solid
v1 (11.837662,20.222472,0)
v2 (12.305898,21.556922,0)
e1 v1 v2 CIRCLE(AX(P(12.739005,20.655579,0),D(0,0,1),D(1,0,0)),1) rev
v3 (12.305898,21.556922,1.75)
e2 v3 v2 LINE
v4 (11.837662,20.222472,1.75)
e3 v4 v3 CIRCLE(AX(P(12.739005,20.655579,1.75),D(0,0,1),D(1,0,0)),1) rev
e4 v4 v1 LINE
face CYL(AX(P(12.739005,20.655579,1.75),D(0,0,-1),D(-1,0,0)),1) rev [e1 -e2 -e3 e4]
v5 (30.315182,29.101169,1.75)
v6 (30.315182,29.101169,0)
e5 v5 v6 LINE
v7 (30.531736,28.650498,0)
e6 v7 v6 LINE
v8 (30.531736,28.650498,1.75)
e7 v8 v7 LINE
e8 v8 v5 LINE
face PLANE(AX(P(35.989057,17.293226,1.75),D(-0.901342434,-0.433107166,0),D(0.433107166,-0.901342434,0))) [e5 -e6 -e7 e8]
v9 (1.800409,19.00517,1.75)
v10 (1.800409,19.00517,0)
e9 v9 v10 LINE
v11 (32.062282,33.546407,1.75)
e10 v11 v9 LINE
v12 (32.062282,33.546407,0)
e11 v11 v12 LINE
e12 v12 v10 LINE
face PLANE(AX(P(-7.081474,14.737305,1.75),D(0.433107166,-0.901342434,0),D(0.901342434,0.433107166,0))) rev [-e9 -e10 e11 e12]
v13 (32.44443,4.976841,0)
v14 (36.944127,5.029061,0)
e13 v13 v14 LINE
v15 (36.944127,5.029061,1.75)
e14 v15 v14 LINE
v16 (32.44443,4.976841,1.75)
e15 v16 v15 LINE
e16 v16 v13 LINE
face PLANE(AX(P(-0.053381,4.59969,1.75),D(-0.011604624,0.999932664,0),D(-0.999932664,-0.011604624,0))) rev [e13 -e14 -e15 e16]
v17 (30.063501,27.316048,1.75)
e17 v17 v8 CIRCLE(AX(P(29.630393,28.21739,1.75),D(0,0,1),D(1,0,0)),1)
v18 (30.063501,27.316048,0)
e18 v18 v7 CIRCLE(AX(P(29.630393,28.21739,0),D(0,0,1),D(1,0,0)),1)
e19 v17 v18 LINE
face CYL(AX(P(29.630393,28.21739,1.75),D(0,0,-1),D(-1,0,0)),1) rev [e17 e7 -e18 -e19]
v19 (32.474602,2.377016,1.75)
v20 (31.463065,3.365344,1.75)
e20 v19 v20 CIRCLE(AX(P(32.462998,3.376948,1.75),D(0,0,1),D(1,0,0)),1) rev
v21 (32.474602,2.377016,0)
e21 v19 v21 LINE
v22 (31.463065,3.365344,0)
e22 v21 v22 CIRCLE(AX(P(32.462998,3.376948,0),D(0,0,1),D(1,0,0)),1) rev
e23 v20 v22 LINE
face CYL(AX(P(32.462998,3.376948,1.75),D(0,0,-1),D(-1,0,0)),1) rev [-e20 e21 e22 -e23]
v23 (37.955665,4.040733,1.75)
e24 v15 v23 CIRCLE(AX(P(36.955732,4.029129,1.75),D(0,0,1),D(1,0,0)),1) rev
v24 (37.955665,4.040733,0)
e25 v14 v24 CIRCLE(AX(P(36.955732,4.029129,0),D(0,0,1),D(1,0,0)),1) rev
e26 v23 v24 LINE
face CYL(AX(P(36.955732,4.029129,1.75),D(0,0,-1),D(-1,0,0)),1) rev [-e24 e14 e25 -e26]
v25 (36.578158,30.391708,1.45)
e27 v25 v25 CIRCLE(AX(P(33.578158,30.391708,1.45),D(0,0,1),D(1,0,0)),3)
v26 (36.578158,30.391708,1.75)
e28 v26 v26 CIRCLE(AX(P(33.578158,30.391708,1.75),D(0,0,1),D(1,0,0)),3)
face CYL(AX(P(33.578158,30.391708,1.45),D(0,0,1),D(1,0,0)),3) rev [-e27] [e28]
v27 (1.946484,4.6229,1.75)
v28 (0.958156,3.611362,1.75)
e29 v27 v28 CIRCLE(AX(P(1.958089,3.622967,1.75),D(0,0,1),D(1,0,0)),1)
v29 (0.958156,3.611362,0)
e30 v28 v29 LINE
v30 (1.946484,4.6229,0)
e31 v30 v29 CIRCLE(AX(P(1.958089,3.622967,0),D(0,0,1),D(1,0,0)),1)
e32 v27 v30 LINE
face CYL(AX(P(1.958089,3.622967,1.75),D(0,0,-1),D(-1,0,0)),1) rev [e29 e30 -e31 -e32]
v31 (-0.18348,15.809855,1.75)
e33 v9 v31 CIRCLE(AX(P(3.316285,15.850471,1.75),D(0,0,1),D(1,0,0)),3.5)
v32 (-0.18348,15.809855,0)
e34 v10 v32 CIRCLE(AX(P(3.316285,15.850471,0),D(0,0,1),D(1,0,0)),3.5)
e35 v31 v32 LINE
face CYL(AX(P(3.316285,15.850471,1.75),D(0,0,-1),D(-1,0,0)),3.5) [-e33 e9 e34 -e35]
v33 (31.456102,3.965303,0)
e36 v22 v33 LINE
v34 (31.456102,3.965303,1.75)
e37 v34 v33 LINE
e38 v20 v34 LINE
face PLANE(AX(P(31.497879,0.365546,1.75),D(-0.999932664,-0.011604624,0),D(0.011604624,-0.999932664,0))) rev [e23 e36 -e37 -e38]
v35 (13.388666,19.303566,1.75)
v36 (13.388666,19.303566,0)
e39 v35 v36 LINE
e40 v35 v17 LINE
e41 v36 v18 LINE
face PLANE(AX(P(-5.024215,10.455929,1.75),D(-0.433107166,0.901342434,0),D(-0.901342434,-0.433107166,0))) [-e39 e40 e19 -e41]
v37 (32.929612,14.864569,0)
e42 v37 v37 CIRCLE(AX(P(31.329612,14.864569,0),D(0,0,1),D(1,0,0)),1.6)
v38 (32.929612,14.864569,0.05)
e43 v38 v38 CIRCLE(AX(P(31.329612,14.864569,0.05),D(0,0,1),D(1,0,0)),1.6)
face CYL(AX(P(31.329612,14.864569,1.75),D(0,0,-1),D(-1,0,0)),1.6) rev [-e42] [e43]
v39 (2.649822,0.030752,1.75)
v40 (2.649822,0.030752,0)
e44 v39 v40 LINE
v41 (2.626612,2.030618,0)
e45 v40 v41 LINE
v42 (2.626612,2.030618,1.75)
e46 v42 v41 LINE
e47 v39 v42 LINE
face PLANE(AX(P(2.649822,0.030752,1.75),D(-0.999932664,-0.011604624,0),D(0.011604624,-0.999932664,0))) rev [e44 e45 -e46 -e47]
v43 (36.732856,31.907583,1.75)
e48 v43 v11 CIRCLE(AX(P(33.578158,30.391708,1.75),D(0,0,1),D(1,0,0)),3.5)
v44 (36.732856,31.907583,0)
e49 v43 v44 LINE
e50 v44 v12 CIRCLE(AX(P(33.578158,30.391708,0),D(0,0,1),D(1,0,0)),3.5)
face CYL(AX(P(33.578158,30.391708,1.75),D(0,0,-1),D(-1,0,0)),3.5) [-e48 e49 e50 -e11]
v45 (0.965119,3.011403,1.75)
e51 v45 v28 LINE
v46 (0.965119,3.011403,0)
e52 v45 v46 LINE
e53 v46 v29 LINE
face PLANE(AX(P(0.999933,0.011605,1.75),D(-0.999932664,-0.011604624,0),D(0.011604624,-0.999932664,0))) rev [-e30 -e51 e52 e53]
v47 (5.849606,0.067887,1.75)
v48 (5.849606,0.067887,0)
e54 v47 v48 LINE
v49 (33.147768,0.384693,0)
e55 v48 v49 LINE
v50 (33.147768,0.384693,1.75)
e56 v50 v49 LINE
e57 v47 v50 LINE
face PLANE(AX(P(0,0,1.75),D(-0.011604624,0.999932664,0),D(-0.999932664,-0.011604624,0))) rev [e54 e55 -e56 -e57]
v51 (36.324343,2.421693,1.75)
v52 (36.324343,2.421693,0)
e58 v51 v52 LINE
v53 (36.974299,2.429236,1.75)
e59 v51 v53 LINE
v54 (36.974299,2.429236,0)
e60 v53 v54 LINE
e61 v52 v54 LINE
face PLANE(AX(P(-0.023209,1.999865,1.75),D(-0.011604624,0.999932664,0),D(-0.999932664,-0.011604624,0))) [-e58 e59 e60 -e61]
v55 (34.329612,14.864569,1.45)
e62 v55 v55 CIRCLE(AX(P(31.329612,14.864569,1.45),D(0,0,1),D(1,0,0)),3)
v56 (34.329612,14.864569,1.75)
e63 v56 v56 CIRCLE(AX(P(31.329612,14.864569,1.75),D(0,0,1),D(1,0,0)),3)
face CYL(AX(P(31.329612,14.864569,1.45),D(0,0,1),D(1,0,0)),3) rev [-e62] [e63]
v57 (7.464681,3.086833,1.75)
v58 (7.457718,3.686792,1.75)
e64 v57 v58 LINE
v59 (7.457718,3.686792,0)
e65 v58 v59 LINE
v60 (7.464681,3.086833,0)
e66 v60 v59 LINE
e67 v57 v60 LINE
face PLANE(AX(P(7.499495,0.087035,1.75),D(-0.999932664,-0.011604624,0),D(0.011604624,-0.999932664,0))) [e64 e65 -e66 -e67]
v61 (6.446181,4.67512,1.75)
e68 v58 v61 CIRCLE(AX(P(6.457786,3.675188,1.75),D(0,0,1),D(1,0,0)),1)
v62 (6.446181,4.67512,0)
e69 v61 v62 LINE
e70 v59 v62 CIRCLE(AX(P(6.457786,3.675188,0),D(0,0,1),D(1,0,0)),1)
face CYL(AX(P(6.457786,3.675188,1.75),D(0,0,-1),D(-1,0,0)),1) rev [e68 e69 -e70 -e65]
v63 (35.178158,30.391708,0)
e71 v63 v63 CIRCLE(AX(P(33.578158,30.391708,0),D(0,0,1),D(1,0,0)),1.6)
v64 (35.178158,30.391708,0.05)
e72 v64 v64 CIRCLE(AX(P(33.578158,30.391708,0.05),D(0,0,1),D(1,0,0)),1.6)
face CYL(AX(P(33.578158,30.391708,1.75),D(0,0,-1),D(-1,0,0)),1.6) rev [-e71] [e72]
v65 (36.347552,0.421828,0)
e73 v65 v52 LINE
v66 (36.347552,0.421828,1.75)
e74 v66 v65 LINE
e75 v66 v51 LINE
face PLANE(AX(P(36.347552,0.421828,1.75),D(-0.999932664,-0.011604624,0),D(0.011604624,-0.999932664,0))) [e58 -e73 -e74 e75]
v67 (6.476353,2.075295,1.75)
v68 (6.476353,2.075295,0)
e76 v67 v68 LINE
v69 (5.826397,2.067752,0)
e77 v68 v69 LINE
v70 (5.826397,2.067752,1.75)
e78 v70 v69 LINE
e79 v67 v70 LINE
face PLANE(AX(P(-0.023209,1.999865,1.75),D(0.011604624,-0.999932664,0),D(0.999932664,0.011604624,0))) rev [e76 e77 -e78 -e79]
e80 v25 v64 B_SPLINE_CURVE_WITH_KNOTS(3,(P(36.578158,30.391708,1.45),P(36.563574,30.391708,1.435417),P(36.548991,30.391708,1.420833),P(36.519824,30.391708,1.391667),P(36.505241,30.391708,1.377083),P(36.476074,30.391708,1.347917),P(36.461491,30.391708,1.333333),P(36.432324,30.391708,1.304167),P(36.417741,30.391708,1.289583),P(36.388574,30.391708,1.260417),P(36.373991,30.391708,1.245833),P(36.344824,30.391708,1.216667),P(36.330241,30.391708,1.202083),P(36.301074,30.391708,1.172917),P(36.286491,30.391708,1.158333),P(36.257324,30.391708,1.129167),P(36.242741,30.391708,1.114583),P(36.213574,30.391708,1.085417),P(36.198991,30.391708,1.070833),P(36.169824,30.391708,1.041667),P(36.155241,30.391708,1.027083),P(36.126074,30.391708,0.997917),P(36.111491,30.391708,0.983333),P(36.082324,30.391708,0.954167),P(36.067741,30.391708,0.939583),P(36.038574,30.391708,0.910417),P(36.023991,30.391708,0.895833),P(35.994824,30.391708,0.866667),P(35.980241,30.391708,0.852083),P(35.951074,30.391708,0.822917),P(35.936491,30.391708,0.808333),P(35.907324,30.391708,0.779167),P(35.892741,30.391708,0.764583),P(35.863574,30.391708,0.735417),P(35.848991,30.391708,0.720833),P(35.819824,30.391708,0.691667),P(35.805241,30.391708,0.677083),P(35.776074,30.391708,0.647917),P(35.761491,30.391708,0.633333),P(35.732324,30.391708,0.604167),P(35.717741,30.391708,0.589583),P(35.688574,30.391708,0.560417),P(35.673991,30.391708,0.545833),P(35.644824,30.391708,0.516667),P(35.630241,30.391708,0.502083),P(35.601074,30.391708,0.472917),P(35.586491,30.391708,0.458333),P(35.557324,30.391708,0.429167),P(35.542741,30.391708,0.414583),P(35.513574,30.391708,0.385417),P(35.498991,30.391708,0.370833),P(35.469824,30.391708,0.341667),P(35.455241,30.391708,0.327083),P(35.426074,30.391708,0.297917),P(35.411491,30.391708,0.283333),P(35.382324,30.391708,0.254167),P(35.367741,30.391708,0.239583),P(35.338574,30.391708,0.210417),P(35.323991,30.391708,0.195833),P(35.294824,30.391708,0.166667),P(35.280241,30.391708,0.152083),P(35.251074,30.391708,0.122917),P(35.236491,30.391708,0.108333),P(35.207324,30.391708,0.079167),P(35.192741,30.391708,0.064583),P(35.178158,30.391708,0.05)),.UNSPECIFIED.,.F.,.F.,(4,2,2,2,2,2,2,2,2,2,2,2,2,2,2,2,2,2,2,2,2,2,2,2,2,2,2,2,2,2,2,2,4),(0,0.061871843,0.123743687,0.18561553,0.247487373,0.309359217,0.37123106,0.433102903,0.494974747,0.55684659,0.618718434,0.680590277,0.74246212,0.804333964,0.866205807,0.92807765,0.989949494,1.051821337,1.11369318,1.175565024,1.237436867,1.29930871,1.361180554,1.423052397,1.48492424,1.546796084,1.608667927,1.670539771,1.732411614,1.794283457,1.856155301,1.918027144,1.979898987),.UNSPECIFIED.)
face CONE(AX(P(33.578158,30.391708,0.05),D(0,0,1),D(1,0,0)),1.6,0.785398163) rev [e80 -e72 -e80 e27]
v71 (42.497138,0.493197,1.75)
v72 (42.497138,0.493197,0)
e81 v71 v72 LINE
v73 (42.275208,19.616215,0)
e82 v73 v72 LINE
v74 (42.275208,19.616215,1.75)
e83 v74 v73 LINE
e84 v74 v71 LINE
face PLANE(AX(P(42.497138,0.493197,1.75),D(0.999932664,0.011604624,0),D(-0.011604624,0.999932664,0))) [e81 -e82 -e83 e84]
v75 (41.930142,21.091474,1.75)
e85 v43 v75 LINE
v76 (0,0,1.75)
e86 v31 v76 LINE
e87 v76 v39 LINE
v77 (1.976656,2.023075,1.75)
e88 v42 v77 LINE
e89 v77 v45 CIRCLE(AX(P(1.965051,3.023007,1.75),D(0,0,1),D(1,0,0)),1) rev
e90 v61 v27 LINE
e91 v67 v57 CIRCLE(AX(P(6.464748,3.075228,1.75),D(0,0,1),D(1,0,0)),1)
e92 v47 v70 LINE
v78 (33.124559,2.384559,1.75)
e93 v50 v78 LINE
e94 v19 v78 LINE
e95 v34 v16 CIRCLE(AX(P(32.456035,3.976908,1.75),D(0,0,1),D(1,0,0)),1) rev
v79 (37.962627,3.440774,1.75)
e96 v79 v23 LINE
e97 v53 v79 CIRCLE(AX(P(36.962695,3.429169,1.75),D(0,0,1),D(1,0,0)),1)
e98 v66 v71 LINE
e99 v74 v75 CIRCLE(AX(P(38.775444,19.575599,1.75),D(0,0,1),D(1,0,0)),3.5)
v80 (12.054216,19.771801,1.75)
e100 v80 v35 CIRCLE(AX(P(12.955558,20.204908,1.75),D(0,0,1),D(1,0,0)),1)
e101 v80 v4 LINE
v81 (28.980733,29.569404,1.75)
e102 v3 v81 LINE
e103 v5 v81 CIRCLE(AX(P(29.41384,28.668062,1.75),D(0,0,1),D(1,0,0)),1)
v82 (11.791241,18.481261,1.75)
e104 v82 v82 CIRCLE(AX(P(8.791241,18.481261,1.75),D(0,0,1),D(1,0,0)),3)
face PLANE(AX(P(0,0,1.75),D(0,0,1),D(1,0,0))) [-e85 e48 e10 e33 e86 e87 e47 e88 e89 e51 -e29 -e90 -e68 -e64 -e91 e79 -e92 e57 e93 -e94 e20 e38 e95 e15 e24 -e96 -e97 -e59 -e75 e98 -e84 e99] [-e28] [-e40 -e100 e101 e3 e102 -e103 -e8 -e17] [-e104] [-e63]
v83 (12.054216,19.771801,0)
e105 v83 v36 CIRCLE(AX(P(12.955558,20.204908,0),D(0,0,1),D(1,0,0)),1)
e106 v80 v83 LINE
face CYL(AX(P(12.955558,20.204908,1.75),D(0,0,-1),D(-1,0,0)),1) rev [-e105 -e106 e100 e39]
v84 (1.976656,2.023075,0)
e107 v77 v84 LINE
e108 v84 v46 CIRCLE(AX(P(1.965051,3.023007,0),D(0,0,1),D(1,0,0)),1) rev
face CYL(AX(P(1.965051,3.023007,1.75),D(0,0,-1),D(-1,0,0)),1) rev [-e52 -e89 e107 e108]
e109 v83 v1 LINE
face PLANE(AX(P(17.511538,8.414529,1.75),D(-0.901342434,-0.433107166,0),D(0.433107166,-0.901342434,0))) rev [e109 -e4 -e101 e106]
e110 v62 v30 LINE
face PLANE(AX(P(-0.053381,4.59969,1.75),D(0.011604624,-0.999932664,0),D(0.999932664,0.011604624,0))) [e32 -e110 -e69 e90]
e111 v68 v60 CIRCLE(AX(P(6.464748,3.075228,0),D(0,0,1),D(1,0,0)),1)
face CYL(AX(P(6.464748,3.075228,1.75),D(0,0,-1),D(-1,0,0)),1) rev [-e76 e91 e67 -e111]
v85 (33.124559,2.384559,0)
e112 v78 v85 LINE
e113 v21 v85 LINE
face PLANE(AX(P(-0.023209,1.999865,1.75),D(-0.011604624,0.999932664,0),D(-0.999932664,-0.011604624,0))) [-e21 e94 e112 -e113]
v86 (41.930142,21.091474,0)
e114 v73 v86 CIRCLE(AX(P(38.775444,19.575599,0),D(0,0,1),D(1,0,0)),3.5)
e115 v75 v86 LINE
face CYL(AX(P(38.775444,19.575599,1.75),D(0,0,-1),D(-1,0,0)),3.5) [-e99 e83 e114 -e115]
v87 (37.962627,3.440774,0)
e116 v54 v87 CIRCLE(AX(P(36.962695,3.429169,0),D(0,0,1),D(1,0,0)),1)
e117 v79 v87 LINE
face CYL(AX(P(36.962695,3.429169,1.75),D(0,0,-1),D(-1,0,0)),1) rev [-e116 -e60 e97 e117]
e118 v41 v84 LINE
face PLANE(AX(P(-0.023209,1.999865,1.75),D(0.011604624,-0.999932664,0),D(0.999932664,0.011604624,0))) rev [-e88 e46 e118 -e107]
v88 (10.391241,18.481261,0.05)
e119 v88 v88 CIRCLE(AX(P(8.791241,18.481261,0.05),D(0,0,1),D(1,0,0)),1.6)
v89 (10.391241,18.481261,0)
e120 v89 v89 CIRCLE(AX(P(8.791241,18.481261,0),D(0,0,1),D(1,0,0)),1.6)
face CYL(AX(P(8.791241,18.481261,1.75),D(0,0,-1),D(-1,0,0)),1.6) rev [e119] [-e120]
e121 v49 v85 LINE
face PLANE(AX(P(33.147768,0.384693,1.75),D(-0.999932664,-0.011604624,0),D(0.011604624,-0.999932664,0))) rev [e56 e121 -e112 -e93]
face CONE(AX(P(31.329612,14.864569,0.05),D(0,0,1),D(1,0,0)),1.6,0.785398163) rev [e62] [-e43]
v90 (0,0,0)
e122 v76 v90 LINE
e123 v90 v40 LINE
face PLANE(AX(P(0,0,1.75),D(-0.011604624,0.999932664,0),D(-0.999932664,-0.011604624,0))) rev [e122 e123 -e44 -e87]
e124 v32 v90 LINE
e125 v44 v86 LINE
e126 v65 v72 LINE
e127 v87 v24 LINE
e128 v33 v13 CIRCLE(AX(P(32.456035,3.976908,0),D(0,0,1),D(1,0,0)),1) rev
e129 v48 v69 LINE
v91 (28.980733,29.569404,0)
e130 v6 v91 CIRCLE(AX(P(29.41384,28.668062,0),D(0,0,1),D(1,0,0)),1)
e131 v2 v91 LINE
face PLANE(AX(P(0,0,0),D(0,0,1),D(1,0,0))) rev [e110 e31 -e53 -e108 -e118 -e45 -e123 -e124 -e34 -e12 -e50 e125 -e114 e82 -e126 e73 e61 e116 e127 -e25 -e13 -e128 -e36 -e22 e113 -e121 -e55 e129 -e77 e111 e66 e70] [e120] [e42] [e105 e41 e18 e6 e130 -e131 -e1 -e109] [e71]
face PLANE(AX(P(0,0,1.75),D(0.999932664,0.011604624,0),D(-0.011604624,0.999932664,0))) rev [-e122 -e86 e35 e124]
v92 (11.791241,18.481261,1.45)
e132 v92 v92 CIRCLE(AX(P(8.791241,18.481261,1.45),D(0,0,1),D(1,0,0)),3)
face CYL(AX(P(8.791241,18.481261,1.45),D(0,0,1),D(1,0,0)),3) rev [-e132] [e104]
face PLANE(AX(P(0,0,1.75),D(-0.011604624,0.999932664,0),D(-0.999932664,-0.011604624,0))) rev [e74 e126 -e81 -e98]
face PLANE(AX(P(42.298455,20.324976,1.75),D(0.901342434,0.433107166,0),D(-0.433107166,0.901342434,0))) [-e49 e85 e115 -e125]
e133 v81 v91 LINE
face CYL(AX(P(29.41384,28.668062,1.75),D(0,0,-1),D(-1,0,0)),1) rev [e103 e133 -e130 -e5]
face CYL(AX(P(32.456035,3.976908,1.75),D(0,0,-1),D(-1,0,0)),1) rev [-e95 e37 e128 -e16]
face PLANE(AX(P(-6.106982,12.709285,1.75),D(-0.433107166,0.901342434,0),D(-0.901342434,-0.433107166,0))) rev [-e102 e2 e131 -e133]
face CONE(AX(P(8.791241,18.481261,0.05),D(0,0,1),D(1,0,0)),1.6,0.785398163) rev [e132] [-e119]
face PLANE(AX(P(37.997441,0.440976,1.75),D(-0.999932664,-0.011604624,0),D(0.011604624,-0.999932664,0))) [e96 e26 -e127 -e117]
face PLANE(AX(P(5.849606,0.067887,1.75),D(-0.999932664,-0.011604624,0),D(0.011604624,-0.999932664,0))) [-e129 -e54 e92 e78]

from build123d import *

# Parameters (mm, degrees)
SKETCH2_R           = 1.6
SKETCH2_R_2         = 3.5
BOSS_EXTRUDE1_DEPTH = 1.75
SKETCH3_R           = 3
CUT_EXTRUDE2_DEPTH  = 0.3
CHAMFER1_SIZE       = 1.4


with BuildPart() as part:
    # Sketch2 → Boss-Extrude1 (new body)
    # profile 1 of 4: a face of its own
    with BuildSketch(Plane(origin=(277.94406545, -368.782269, 0), x_dir=(0.99993266408239, 0.011604624125499034, 0), z_dir=(0, 0, 1))):
        with BuildLine():
            Line((-273.645770216, 387.793792834), (-273.645770216, 371.982873115))
            Line((-273.645770216, 371.982873115), (-270.995770216, 371.982873115))
            Line((-270.995770216, 371.982873115), (-270.995770216, 373.982873115))
            Line((-270.995770216, 373.982873115), (-271.645770216, 373.982873115))
            ThreePointArc((-271.645770216, 373.982873115), (-272.352876997, 374.275766334), (-272.645770216, 374.982873115))
            Line((-272.645770216, 374.982873115), (-272.645770216, 375.582873115))
            ThreePointArc((-272.645770216, 375.582873115), (-272.352876997, 376.289979896), (-271.645770216, 376.582873115))
            Line((-271.645770216, 376.582873115), (-267.145770216, 376.582873115))
            ThreePointArc((-267.145770216, 376.582873115), (-266.438663434, 376.289979896), (-266.145770216, 375.582873115))
            Line((-266.145770216, 375.582873115), (-266.145770216, 374.982873115))
            ThreePointArc((-266.145770216, 374.982873115), (-266.438663434, 374.275766334), (-267.145770216, 373.982873115))
            Line((-267.145770216, 373.982873115), (-267.795770216, 373.982873115))
            Line((-267.795770216, 373.982873115), (-267.795770216, 371.982873115))
            Line((-267.795770216, 371.982873115), (-240.495770216, 371.982873115))
            Line((-240.495770216, 371.982873115), (-240.495770216, 373.982873115))
            Line((-240.495770216, 373.982873115), (-241.145770216, 373.982873115))
            ThreePointArc((-241.145770216, 373.982873115), (-241.852876997, 374.275766334), (-242.145770216, 374.982873115))
            Line((-242.145770216, 374.982873115), (-242.145770216, 375.582873115))
            ThreePointArc((-242.145770216, 375.582873115), (-241.852876997, 376.289979896), (-241.145770216, 376.582873115))
            Line((-241.145770216, 376.582873115), (-236.645770216, 376.582873115))
            ThreePointArc((-236.645770216, 376.582873115), (-235.938663434, 376.289979896), (-235.645770216, 375.582873115))
            Line((-235.645770216, 375.582873115), (-235.645770216, 374.982873115))
            ThreePointArc((-235.645770216, 374.982873115), (-235.938663434, 374.275766334), (-236.645770216, 373.982873115))
            Line((-236.645770216, 373.982873115), (-237.295770216, 373.982873115))
            Line((-237.295770216, 373.982873115), (-237.295770216, 371.982873115))
            Line((-237.295770216, 371.982873115), (-231.145770216, 371.982873115))
            Line((-231.145770216, 371.982873115), (-231.145770216, 391.107179671))
            ThreePointArc((-231.145770216, 391.107179671), (-238.062806241, 390.349641022), (-231.473692961, 392.586343587))
            Line((-231.473692961, 392.586343587), (-236.545112102, 403.462037031))
            ThreePointArc((-236.545112102, 403.462037031), (-236.300153332, 402.740411764), (-236.217189356, 401.982873115))
            ThreePointArc((-236.217189356, 401.982873115), (-238.959651202, 398.565836981), (-242.889267039, 400.503710116))
            ThreePointArc((-242.889267039, 400.503710116), (-243.006113356, 403.179944092), (-241.196353273, 405.15495037))
            Line((-241.196353273, 405.15495037), (-271.624933816, 390.965870235))
            ThreePointArc((-271.624933816, 390.965870235), (-268.26522144, 390.745662801), (-266.645770216, 387.793792834))
            ThreePointArc((-266.645770216, 387.793792834), (-270.145770216, 384.293792834), (-273.645770216, 387.793792834))
        make_face()
        with Locations(Location((-242.145770216, 386.482873115, 0), (0, 0, 359.335089091))):
            Circle(SKETCH2_R, mode=Mode.SUBTRACT)
        with Locations(Location((-264.6406535, 390.360870917, 0), (0, 0, 359.335089091))):
            Circle(SKETCH2_R, mode=Mode.SUBTRACT)
        with BuildLine():
            Line((-242.994921177, 400.730286146), (-242.889267039, 400.503710116))
            Line((-242.889267039, 400.503710116), (-242.783612046, 400.277132252))
            ThreePointArc((-242.783612046, 400.277132252), (-242.750227212, 399.512493847), (-243.267301571, 398.948206203))
            Line((-243.267301571, 398.948206203), (-260.033995631, 391.129768361))
            ThreePointArc((-260.033995631, 391.129768361), (-260.798634036, 391.096383528), (-261.36292168, 391.613457887))
            Line((-261.36292168, 391.613457887), (-261.574230811, 392.06661178))
            ThreePointArc((-261.574230811, 392.06661178), (-261.607615645, 392.831250185), (-261.090541285, 393.395537829))
            Line((-261.090541285, 393.395537829), (-244.323847225, 401.213975671))
            ThreePointArc((-244.323847225, 401.213975671), (-243.55920882, 401.247360505), (-242.994921177, 400.730286146))
        make_face(mode=Mode.SUBTRACT)
    # profile 2 of 4: a face of its own
    with BuildSketch(Plane(origin=(277.94406545, -368.782269, 0), x_dir=(0.99993266408239, 0.011604624125499034, 0), z_dir=(0, 0, 1))):
        with Locations((-270.145770216, 387.793792834)):
            Circle(SKETCH2_R_2)
    # profile 3 of 4: a face of its own
    with BuildSketch(Plane(origin=(277.94406545, -368.782269, 0), x_dir=(0.99993266408239, 0.011604624125499034, 0), z_dir=(0, 0, 1))):
        with Locations((-234.645770216, 391.107179671)):
            Circle(SKETCH2_R_2)
    # profile 4 of 4: a face of its own
    with BuildSketch(Plane(origin=(277.94406545, -368.782269, 0), x_dir=(0.99993266408239, 0.011604624125499034, 0), z_dir=(0, 0, 1))):
        with Locations((-239.717189356, 401.982873115)):
            Circle(SKETCH2_R_2)
        with Locations(Location((-239.717189356, 401.982873115, 0), (0, 0, 359.335089091))):
            Circle(SKETCH2_R, mode=Mode.SUBTRACT)
    extrude(amount=BOSS_EXTRUDE1_DEPTH)

    # Sketch3 → Cut-Extrude2 (cut)
    with BuildSketch(Plane.XY.offset(1.75)):
        with Locations((8.791240591, 18.481261297)):
            Circle(SKETCH3_R)
        with Locations((31.329611869, 14.864569289)):
            Circle(SKETCH3_R)
        with Locations((33.578157523, 30.39170835)):
            Circle(SKETCH3_R)
    extrude(amount=-CUT_EXTRUDE2_DEPTH, mode=Mode.SUBTRACT)

    # Chamfer1
    chamfer1_edges = [part.edges().sort_by_distance(p)[0] for p in [
        (7.191240591, 18.481261297, 1.45),
        (29.729611869, 14.864569289, 1.45),
        (31.978157523, 30.39170835, 1.45),
    ]]
    chamfer(chamfer1_edges, length=CHAMFER1_SIZE - 0.0001)  # a hair under: the kernel refuses the full size


solid = part.part
